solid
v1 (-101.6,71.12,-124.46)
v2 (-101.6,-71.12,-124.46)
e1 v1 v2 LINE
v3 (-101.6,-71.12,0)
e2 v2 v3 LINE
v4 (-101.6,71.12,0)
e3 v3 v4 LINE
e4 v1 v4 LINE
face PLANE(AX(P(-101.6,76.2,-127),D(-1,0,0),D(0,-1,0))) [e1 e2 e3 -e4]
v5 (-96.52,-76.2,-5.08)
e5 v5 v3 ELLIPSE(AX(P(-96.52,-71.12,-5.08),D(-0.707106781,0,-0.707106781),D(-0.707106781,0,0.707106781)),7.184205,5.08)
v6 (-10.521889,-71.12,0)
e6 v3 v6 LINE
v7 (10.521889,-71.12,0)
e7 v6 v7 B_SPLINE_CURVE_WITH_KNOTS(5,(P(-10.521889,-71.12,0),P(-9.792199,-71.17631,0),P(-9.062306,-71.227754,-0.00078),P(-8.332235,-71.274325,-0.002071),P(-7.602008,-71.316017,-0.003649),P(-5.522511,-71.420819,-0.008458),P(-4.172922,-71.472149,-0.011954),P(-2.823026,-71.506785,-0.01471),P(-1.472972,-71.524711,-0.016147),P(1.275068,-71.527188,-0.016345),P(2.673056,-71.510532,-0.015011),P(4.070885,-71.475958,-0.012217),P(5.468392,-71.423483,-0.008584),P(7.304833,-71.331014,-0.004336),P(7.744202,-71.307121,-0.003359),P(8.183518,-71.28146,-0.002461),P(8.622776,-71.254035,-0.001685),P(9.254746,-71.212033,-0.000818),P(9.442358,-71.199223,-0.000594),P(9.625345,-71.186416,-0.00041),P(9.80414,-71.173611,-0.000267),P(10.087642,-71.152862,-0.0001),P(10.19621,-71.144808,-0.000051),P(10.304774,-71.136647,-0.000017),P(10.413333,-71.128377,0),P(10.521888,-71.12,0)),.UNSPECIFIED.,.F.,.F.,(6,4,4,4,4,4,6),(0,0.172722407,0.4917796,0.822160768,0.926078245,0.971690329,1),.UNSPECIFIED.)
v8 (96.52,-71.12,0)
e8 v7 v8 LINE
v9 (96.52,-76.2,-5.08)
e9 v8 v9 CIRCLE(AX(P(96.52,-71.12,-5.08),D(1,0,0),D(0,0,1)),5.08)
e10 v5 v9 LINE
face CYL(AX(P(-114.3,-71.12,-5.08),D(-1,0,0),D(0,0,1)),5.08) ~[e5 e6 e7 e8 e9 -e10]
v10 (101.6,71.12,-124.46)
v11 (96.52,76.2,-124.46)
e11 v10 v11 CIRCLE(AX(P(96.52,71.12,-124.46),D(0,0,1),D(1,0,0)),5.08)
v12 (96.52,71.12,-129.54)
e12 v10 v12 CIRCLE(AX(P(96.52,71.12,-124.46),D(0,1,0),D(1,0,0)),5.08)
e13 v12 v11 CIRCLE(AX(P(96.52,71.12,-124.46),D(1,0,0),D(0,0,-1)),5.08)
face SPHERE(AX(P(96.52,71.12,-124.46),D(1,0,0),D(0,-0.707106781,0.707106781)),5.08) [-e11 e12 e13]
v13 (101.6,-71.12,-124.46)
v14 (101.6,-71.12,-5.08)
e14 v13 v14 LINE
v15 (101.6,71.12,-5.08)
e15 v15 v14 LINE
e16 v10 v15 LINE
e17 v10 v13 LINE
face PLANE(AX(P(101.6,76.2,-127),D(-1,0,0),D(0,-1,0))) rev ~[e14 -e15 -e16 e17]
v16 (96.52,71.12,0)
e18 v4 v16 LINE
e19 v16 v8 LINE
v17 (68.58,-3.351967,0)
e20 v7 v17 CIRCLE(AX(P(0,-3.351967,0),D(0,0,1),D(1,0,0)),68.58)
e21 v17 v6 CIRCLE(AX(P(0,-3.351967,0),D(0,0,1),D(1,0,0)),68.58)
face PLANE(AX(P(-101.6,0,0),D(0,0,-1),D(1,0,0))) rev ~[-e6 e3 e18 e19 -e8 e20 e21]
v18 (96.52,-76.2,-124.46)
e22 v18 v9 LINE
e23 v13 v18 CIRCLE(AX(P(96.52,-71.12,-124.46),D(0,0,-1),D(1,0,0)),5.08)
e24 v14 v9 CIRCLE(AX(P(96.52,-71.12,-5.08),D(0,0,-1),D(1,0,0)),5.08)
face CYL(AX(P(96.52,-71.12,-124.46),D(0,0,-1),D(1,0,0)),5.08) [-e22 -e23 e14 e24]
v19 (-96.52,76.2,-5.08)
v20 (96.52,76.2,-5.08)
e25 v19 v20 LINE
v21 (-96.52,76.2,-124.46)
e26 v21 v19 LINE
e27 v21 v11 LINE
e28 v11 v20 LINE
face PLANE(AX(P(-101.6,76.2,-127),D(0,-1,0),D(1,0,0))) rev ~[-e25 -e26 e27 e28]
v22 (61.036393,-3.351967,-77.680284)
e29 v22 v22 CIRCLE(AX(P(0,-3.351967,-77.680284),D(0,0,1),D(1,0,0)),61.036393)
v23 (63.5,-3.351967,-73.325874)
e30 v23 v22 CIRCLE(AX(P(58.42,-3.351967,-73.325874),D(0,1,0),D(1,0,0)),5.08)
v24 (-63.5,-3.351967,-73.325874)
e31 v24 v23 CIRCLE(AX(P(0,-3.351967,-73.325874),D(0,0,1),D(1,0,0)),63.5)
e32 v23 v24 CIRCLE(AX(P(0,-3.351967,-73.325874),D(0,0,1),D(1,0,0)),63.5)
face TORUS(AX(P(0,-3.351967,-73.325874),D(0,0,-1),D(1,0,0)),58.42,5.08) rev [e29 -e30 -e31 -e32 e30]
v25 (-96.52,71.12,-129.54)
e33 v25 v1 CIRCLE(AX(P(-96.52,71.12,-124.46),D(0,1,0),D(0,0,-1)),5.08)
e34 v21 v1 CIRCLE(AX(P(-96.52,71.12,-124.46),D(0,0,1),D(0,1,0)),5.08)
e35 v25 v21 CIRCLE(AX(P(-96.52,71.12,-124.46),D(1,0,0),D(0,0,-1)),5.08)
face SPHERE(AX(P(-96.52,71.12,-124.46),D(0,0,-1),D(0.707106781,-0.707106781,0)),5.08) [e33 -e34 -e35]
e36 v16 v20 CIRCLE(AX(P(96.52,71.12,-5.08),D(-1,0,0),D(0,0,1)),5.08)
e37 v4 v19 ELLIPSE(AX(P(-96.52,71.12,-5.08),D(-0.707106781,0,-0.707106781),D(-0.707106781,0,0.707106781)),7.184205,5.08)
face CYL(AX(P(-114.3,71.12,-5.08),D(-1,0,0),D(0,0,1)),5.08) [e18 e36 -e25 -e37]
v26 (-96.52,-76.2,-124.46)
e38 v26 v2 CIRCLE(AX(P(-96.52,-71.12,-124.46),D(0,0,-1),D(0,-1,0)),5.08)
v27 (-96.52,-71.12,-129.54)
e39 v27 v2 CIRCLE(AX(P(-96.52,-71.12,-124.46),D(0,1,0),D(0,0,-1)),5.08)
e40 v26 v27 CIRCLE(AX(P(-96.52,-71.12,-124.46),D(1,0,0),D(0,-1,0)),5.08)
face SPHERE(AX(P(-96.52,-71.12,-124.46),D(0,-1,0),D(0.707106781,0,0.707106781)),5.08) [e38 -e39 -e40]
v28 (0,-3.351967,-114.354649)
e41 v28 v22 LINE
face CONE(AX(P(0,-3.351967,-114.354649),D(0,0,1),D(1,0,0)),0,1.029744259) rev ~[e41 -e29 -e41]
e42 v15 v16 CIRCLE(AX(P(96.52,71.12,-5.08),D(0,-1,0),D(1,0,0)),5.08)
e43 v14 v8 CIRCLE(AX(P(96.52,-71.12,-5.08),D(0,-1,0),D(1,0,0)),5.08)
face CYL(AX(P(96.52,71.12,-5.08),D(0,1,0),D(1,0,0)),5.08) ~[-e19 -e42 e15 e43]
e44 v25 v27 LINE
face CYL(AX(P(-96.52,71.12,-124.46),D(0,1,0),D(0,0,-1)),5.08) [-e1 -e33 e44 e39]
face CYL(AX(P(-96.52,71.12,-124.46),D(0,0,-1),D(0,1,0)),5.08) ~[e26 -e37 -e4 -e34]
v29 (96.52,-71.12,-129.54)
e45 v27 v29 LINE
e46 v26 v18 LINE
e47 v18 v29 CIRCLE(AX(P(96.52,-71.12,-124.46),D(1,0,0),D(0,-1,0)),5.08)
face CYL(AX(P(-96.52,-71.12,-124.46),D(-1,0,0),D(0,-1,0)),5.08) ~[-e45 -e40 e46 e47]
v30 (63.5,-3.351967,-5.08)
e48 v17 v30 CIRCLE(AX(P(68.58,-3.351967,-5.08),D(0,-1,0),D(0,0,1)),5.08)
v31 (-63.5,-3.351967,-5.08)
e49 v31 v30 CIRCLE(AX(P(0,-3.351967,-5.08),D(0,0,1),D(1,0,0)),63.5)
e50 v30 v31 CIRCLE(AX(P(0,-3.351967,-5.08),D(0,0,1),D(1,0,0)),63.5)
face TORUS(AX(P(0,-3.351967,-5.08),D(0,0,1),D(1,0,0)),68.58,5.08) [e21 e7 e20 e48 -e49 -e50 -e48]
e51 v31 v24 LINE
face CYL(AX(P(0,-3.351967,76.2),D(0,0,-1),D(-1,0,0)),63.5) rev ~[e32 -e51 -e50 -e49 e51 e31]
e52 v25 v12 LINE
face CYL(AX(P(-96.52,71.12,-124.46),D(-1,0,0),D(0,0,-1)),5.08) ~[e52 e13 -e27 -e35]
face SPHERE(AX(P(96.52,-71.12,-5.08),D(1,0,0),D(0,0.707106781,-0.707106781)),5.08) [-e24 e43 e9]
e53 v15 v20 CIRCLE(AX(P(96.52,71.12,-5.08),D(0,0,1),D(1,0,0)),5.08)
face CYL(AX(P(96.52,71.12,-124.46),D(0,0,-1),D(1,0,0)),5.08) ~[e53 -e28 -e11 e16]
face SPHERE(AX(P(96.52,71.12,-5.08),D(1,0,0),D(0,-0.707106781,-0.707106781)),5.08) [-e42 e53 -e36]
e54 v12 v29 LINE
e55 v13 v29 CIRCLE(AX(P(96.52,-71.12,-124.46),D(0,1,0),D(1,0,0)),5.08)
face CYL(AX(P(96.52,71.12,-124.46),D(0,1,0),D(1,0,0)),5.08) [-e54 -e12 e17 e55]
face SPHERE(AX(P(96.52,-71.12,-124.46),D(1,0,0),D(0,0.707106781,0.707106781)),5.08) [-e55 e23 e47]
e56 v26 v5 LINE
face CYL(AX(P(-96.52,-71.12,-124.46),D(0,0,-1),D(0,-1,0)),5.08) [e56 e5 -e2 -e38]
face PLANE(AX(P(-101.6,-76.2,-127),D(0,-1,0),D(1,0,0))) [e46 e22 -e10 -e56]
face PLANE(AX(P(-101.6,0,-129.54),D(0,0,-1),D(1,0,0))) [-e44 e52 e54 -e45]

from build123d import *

# Parameters (mm, degrees)
F1_W         = 203.2
F1_H         = 127
F2_DEPTH     = 76.2
F3_D         = 127
F3_DEPTH     = 76.2
F3_TIP       = 38.1546493083
F4_DEPTH     = 2.54
F5_T3_DEPTH  = 210.82
F5_T5_DEPTH  = 142.24
F5_T7_DEPTH  = 193.04
F5_T9_DEPTH  = 137.16
F5_T11_DEPTH = 119.38
F5_S15_W     = 5.08
F5_S15_H     = 5.08
F5_T16_DEPTH = 5.08
F5_S21_W     = 5.08
F5_S21_H     = 5.08
F5_T22_DEPTH = 5.08
F5_S27_W     = 5.08
F5_S27_H     = 5.08
F5_T28_DEPTH = 5.08
F5_S33_W     = 5.08
F5_S33_H     = 5.08
F5_T34_DEPTH = 5.08
F5_S39_W     = 5.08
F5_S39_H     = 5.08
F5_T40_DEPTH = 5.08
F5_S45_W     = 5.08
F5_S45_H     = 5.08
F5_T46_DEPTH = 5.08


# Not quite as in the source:
# - a fillet or chamfer that OpenCascade refuses, or shapes differently, is made with other operations: its cross-section is extruded or revolved along the edge and cut away or added


with BuildPart() as f2:
    # F1 (on Front) → F2 (new body, symmetric)
    with BuildSketch(Plane.XZ):
        with Locations((0, -63.5)):
            Rectangle(F1_W, F1_H)
    extrude(amount=F2_DEPTH, both=True)

    # F3
    with Locations(Plane.XY):
        with Locations((0, -3.3519673161)):
            Hole(F3_D / 2, depth=F3_DEPTH)
            with Locations((0, 0, -(F3_DEPTH + F3_TIP / 2))):  # 118° drill point
                Cone(0, F3_D / 2, F3_TIP, mode=Mode.SUBTRACT)

    # F4 (add): a face of the model
    f4_faces = [f2.faces().sort_by_distance(p)[0] for p in [
        (0, 0, -127),
    ]]
    extrude(f4_faces, amount=F4_DEPTH)

    # F5: fillet of radius 5.08 on 13 edges, made by hand

    # F5_s1 → F5_t2 (revolve)
    with BuildSketch(Plane.XZ.offset(3.3519673161)):
        with BuildLine():
            ThreePointArc((63.5, -73.3258742868), (62.8414069354, -75.8273859721), (61.0363934205, -77.6802841744))
            Line((61.0363934205, -77.6802841744), (63.5, -76.2))
            Line((63.5, -76.2), (63.5, -73.3258742868))
        make_face()
    revolve(axis=Axis((0, -3.3519673161, -76.2), (0, 0, 1)))

    # F5_s4 → F5_t3 (cut)
    with BuildSketch(Plane.YZ.offset(-114.3)):
        with BuildLine():
            ThreePointArc((71.12, 0), (74.7121024484, -1.4878975516), (76.2, -5.08))
            Line((76.2, -5.08), (76.2, 0))
            Line((76.2, 0), (71.12, 0))
        make_face()
        with BuildLine():
            ThreePointArc((-71.12, 0), (-74.7121024484, -1.4878975516), (-76.2, -5.08))
            Line((-76.2, -5.08), (-76.2, 0))
            Line((-76.2, 0), (-71.12, 0))
        make_face()
    extrude(amount=F5_T3_DEPTH, mode=Mode.SUBTRACT)

    # F5_s6 → F5_t5 (cut)
    with BuildSketch(Plane.XZ.offset(-71.12)):
        with BuildLine():
            ThreePointArc((101.6, -5.08), (100.1121024484, -1.4878975516), (96.52, 0))
            Line((96.52, 0), (101.6, 0))
            Line((101.6, 0), (101.6, -5.08))
        make_face()
        with BuildLine():
            ThreePointArc((101.6, -124.46), (100.1121024484, -128.0521024484), (96.52, -129.54))
            Line((96.52, -129.54), (101.6, -129.54))
            Line((101.6, -129.54), (101.6, -124.46))
        make_face()
        with BuildLine():
            ThreePointArc((-96.52, -129.54), (-100.1121024484, -128.0521024484), (-101.6, -124.46))
            Line((-101.6, -124.46), (-101.6, -129.54))
            Line((-101.6, -129.54), (-96.52, -129.54))
        make_face()
    extrude(amount=F5_T5_DEPTH, mode=Mode.SUBTRACT)

    # F5_s8 → F5_t7 (cut)
    with BuildSketch(Plane.YZ.offset(-96.52)):
        with BuildLine():
            ThreePointArc((-76.2, -124.46), (-74.7121024484, -128.0521024484), (-71.12, -129.54))
            Line((-71.12, -129.54), (-76.2, -129.54))
            Line((-76.2, -129.54), (-76.2, -124.46))
        make_face()
        with BuildLine():
            ThreePointArc((71.12, -129.54), (74.7121024484, -128.0521024484), (76.2, -124.46))
            Line((76.2, -124.46), (76.2, -129.54))
            Line((76.2, -129.54), (71.12, -129.54))
        make_face()
    extrude(amount=F5_T7_DEPTH, mode=Mode.SUBTRACT)

    # F5_s10 → F5_t9 (cut)
    with BuildSketch(Plane.XY.offset(-124.46)):
        with BuildLine():
            ThreePointArc((-96.52, -76.2), (-100.1121024484, -74.7121024484), (-101.6, -71.12))
            Line((-101.6, -71.12), (-101.6, -76.2))
            Line((-101.6, -76.2), (-96.52, -76.2))
        make_face()
        with BuildLine():
            ThreePointArc((-96.52, 76.2), (-100.1121024484, 74.7121024484), (-101.6, 71.12))
            Line((-101.6, 71.12), (-101.6, 76.2))
            Line((-101.6, 76.2), (-96.52, 76.2))
        make_face()
    extrude(amount=F5_T9_DEPTH, mode=Mode.SUBTRACT)

    # F5_s12 → F5_t11 (cut)
    with BuildSketch(Plane.XY.offset(-124.46)):
        with BuildLine():
            ThreePointArc((101.6, -71.12), (100.1121024484, -74.7121024484), (96.52, -76.2))
            Line((96.52, -76.2), (101.6, -76.2))
            Line((101.6, -76.2), (101.6, -71.12))
        make_face()
        with BuildLine():
            ThreePointArc((101.6, 71.12), (100.1121024484, 74.7121024484), (96.52, 76.2))
            Line((96.52, 76.2), (101.6, 76.2))
            Line((101.6, 76.2), (101.6, 71.12))
        make_face()
    extrude(amount=F5_T11_DEPTH, mode=Mode.SUBTRACT)


with BuildPart() as f5_tool14:
    # F5_s15 → F5_t16 (new body)
    with BuildSketch(Plane.YZ.offset(96.52)):
        with Locations((73.66, -2.54)):
            Rectangle(F5_S15_W, F5_S15_H)
    extrude(amount=F5_T16_DEPTH)

    # F5_s17 → F5_t18 (revolve, cut)
    with BuildSketch(Plane(origin=(96.52, 71.12, -5.08), x_dir=(0, -0.7071067812, -0.7071067812), z_dir=(0, -0.7071067812, 0.7071067812))):
        with BuildLine():
            ThreePointArc((0, -5.08), (5.08, 0), (0, 5.08))
            Line((0, 5.08), (0, -5.08))
        make_face()
    revolve(axis=Axis((96.52, 71.12, -5.08), (1, 0, 0)), mode=Mode.SUBTRACT)


with BuildPart() as f2_1:
    add(f2.part)

    # F5_t13: cut F5_tool14
    add(f5_tool14.part, mode=Mode.SUBTRACT)


with BuildPart() as f5_tool20:
    # F5_s21 → F5_t22 (new body)
    with BuildSketch(Plane.YZ.offset(96.52)):
        with Locations((-73.66, -2.54)):
            Rectangle(F5_S21_W, F5_S21_H)
    extrude(amount=F5_T22_DEPTH)

    # F5_s23 → F5_t24 (revolve, cut)
    with BuildSketch(Plane(origin=(96.52, -71.12, -5.08), x_dir=(0, 0.7071067812, -0.7071067812), z_dir=(0, -0.7071067812, -0.7071067812))):
        with BuildLine():
            ThreePointArc((0, -5.08), (5.08, 0), (0, 5.08))
            Line((0, 5.08), (0, -5.08))
        make_face()
    revolve(axis=Axis((96.52, -71.12, -5.08), (1, 0, 0)), mode=Mode.SUBTRACT)


with BuildPart() as f2_2:
    add(f2_1.part)

    # F5_t19: cut F5_tool20
    add(f5_tool20.part, mode=Mode.SUBTRACT)


with BuildPart() as f5_tool26:
    # F5_s27 → F5_t28 (new body)
    with BuildSketch(Plane.YZ.offset(96.52)):
        with Locations((-73.66, -127)):
            Rectangle(F5_S27_W, F5_S27_H)
    extrude(amount=F5_T28_DEPTH)

    # F5_s29 → F5_t30 (revolve, cut)
    with BuildSketch(Plane(origin=(96.52, -71.12, -124.46), x_dir=(0, 0.7071067812, 0.7071067812), z_dir=(0, 0.7071067812, -0.7071067812))):
        with BuildLine():
            ThreePointArc((0, -5.08), (5.08, 0), (0, 5.08))
            Line((0, 5.08), (0, -5.08))
        make_face()
    revolve(axis=Axis((96.52, -71.12, -124.46), (1, 0, 0)), mode=Mode.SUBTRACT)


with BuildPart() as f2_3:
    add(f2_2.part)

    # F5_t25: cut F5_tool26
    add(f5_tool26.part, mode=Mode.SUBTRACT)


with BuildPart() as f5_tool32:
    # F5_s33 → F5_t34 (new body)
    with BuildSketch(Plane.YZ.offset(96.52)):
        with Locations((73.66, -127)):
            Rectangle(F5_S33_W, F5_S33_H)
    extrude(amount=F5_T34_DEPTH)

    # F5_s35 → F5_t36 (revolve, cut)
    with BuildSketch(Plane(origin=(96.52, 71.12, -124.46), x_dir=(0, -0.7071067812, 0.7071067812), z_dir=(0, 0.7071067812, 0.7071067812))):
        with BuildLine():
            ThreePointArc((0, -5.08), (5.08, 0), (0, 5.08))
            Line((0, 5.08), (0, -5.08))
        make_face()
    revolve(axis=Axis((96.52, 71.12, -124.46), (1, 0, 0)), mode=Mode.SUBTRACT)


with BuildPart() as f2_4:
    add(f2_3.part)

    # F5_t31: cut F5_tool32
    add(f5_tool32.part, mode=Mode.SUBTRACT)


with BuildPart() as f5_tool38:
    # F5_s39 → F5_t40 (new body)
    with BuildSketch(Plane.XZ.offset(71.12)):
        with Locations((-99.06, -127)):
            Rectangle(F5_S39_W, F5_S39_H)
    extrude(amount=F5_T40_DEPTH)

    # F5_s41 → F5_t42 (revolve, cut)
    with BuildSketch(Plane(origin=(-96.52, -71.12, -124.46), x_dir=(0.7071067812, 0, 0.7071067812), z_dir=(0.7071067812, 0, -0.7071067812))):
        with BuildLine():
            ThreePointArc((0, -5.08), (5.08, 0), (0, 5.08))
            Line((0, 5.08), (0, -5.08))
        make_face()
    revolve(axis=Axis((-96.52, -71.12, -124.46), (0, -1, 0)), mode=Mode.SUBTRACT)


with BuildPart() as f2_5:
    add(f2_4.part)

    # F5_t37: cut F5_tool38
    add(f5_tool38.part, mode=Mode.SUBTRACT)


with BuildPart() as f5_tool44:
    # F5_s45 → F5_t46 (new body)
    with BuildSketch(Plane.XY.offset(-124.46)):
        with Locations((-99.06, 73.66)):
            Rectangle(F5_S45_W, F5_S45_H)
    extrude(amount=-F5_T46_DEPTH)

    # F5_s47 → F5_t48 (revolve, cut)
    with BuildSketch(Plane(origin=(-96.52, 71.12, -124.46), x_dir=(0.7071067812, -0.7071067812, 0), z_dir=(0.7071067812, 0.7071067812, 0))):
        with BuildLine():
            ThreePointArc((0, -5.08), (5.08, 0), (0, 5.08))
            Line((0, 5.08), (0, -5.08))
        make_face()
    revolve(axis=Axis((-96.52, 71.12, -124.46), (0, 0, -1)), mode=Mode.SUBTRACT)


with BuildPart() as f2_6:
    add(f2_5.part)

    # F5_t43: cut F5_tool44
    add(f5_tool44.part, mode=Mode.SUBTRACT)

    # F5_s49 → F5_t50 (revolve, cut)
    with BuildSketch(Plane.XZ.offset(3.3519673161)):
        with BuildLine():
            ThreePointArc((68.58, 0), (64.9878975516, -1.4878975516), (63.5, -5.08))
            Line((63.5, -5.08), (63.5, 0))
            Line((63.5, 0), (68.58, 0))
        make_face()
    revolve(axis=Axis((0, -3.3519673161, 0), (0, 0, 1)), mode=Mode.SUBTRACT)


solid = f2_6.part
